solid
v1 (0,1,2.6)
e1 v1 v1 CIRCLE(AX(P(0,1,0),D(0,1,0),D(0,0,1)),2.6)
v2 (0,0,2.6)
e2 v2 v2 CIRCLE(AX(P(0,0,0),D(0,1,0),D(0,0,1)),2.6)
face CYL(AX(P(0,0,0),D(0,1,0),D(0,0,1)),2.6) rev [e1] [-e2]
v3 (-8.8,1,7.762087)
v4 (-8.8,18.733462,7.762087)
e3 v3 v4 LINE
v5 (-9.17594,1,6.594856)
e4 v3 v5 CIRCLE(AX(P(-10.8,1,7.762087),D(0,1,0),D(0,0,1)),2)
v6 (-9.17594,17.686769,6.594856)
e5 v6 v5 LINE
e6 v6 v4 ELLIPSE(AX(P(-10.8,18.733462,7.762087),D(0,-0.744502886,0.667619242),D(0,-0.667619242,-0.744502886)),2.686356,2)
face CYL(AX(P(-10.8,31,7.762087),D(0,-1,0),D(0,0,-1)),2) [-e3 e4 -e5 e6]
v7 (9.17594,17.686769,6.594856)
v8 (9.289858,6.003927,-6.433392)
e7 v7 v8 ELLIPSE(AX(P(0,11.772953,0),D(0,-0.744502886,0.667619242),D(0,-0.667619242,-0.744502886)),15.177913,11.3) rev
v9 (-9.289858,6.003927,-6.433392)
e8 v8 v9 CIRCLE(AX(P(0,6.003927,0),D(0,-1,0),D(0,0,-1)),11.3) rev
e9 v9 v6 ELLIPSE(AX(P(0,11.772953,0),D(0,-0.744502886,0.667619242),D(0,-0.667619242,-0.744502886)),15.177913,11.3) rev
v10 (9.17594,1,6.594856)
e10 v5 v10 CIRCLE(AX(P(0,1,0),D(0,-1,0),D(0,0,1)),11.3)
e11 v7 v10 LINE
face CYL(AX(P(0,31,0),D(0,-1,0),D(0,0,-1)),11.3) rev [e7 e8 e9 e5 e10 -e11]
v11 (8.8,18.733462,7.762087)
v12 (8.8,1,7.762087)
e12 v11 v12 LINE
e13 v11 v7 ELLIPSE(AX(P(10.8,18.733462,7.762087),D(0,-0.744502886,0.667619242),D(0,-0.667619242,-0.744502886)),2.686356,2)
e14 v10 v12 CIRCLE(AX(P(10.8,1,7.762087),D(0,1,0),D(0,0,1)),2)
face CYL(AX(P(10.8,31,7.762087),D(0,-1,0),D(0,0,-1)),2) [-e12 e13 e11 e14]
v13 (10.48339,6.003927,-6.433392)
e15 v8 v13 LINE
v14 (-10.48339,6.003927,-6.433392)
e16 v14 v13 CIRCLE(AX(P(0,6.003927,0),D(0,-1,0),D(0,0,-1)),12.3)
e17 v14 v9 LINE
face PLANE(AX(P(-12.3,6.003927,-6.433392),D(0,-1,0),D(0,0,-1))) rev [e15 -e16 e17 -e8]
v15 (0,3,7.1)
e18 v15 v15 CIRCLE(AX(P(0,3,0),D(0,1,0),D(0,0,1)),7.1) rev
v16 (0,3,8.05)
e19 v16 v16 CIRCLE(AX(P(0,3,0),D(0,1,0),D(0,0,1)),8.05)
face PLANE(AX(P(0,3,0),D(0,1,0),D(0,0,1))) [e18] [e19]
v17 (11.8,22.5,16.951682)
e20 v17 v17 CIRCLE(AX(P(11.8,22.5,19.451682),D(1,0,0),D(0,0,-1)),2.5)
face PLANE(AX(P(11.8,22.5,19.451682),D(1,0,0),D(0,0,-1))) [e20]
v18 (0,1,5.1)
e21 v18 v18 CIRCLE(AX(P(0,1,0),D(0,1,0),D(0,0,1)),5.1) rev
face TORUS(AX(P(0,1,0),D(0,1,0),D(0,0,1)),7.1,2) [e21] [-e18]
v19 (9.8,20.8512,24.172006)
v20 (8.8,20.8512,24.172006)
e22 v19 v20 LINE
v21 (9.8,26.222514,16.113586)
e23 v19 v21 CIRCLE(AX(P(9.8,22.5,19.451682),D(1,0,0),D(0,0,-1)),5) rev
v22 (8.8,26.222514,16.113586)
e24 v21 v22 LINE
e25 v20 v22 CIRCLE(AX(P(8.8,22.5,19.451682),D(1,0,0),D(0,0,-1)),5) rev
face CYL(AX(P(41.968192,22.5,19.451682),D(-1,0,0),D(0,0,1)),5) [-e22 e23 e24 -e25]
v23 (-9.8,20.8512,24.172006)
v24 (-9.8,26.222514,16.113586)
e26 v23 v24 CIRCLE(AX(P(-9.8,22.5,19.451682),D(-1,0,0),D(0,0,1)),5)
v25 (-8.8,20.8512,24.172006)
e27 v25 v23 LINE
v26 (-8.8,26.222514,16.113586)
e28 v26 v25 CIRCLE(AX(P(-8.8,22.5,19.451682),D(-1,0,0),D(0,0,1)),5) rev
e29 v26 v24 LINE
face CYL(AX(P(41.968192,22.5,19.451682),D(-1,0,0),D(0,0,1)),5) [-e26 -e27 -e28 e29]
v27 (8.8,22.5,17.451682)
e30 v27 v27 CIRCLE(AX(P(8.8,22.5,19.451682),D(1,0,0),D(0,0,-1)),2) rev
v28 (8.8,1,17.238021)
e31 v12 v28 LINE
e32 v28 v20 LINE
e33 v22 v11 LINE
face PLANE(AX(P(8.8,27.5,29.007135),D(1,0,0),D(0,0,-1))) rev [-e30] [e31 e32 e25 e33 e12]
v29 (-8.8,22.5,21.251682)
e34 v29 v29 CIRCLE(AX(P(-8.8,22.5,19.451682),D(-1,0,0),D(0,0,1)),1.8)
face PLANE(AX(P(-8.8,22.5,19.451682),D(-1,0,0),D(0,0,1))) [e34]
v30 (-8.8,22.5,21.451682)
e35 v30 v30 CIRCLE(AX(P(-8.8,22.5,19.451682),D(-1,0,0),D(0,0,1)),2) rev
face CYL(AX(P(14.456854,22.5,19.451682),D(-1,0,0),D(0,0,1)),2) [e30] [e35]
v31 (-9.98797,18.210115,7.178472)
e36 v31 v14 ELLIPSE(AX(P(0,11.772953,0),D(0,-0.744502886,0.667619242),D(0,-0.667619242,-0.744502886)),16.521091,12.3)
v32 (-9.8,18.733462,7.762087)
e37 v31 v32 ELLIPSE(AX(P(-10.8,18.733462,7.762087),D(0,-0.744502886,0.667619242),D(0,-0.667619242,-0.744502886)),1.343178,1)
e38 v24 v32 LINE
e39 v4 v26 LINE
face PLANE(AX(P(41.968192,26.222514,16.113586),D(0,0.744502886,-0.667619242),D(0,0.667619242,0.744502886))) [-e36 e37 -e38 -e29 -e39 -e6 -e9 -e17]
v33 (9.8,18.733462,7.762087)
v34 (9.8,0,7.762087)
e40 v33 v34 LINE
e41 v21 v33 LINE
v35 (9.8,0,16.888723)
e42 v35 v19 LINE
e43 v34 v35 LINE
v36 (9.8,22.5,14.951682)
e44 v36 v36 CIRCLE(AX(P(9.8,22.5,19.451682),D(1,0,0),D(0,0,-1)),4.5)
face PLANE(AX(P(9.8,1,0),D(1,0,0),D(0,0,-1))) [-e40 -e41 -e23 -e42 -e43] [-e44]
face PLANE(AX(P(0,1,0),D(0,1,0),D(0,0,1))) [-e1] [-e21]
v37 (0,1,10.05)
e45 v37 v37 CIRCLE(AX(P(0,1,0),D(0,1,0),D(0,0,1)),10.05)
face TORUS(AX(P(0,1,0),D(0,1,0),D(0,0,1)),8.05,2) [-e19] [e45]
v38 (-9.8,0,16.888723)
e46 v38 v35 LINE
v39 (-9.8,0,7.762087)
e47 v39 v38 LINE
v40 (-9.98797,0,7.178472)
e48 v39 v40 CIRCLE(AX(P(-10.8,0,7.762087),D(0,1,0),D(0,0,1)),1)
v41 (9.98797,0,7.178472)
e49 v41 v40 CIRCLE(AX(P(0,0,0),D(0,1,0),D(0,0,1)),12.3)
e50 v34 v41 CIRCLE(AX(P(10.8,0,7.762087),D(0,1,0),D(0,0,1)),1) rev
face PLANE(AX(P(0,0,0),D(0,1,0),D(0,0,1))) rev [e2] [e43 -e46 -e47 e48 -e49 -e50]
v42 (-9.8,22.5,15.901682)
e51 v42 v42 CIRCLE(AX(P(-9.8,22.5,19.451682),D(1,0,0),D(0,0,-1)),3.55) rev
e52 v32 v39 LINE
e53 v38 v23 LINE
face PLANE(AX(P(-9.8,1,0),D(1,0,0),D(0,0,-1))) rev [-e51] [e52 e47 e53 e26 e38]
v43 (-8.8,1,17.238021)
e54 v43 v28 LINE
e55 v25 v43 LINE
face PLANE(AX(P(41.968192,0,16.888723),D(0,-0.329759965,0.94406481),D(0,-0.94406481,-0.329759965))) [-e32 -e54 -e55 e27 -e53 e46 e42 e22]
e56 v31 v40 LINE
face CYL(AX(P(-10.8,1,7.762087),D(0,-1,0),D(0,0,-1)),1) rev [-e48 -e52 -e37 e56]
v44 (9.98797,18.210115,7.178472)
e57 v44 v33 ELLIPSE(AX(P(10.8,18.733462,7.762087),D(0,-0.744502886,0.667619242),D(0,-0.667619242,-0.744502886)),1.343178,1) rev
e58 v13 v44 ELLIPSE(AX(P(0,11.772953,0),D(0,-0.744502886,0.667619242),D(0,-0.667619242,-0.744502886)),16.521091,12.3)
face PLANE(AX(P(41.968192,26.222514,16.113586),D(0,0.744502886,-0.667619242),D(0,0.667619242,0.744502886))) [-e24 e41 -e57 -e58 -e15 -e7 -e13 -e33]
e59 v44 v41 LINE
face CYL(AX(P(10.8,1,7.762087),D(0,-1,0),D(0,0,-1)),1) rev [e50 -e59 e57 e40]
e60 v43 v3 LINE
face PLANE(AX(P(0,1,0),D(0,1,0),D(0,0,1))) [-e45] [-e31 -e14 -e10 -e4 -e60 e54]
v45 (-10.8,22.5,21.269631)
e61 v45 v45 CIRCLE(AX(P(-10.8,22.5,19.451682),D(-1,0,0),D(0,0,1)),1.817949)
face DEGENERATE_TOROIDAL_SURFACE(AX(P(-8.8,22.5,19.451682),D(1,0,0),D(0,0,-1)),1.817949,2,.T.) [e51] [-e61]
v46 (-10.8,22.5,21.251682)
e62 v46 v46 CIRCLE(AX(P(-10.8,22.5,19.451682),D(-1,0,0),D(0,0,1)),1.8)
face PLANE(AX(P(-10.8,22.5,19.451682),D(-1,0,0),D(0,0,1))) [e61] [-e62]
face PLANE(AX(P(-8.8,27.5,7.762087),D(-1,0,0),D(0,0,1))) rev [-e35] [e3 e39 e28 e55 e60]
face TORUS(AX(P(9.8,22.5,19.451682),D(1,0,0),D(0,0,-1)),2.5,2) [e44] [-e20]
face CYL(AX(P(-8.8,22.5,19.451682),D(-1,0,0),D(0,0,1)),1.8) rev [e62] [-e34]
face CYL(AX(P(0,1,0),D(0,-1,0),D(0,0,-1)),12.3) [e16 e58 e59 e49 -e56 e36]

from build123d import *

# Parameters (mm, degrees)
BOSS_EXTRUDE3_DEPTH     = 1
BOSS_EXTRUDE4_DEPTH     = 19.6
CUT_EXTRUDE3_START      = -1
CUT_EXTRUDE3_DEPTH      = 38.799803657
BOSS_EXTRUDE5_DEPTH     = 30
CUT_EXTRUDE4_DEPTH      = 42.354259319
CUT_EXTRUDE4_DEPTH_BACK = 42.354259319
SKETCH9_R               = 2
BOSS_EXTRUDE6_DEPTH     = 17.6
SKETCH10_R              = 3.55
BOSS_EXTRUDE7_DEPTH     = 1
SKETCH11_R              = 1.8
CUT_EXTRUDE5_DEPTH      = 2
SKETCH12_R              = 4.5
BOSS_EXTRUDE8_DEPTH     = 2
SKETCH13_R              = 10.05
SKETCH13_R_2            = 5.1
BOSS_EXTRUDE9_DEPTH     = 2
SKETCH14_R              = 2.6
CUT_EXTRUDE6_DEPTH      = 39.097569002
FILLET2_R               = 2
FILLET3_R               = 2
FILLET4_R               = 2
FILLET5_R               = 2


# Some blends are built 0.0001 mm under size
with BuildPart() as part:
    # Sketch1 → Boss-Extrude3 (new body)
    # profile 1 of 2: a face of its own
    with BuildSketch(Plane(origin=(0, 0, 0), x_dir=(1, 0, 0), z_dir=(0, 1, 0))):
        with BuildLine():
            Line((9.8, -7.762087348), (9.8, -16.888723439))
            Line((9.8, -16.888723439), (-9.8, -16.888723439))
            Line((-9.8, -16.888723439), (-9.8, -7.762087348))
            ThreePointArc((-9.8, -7.762087348), (-9.848151778, -7.455517678), (-9.987969925, -7.178471758))
            ThreePointArc((-9.987969925, -7.178471758), (0, 12.3), (9.987969925, -7.178471758))
            ThreePointArc((9.987969925, -7.178471758), (9.848151778, -7.455517678), (9.8, -7.762087348))
        make_face()
        with BuildLine():
            ThreePointArc((8.8, -7.762087348), (8.896303556, -7.148948009), (9.17593985, -6.594856168))
            ThreePointArc((9.17593985, -6.594856168), (0, 11.3), (-9.17593985, -6.594856168))
            ThreePointArc((-9.17593985, -6.594856168), (-8.896303556, -7.148948009), (-8.8, -7.762087348))
            Line((-8.8, -7.762087348), (-8.8, -15.888723439))
            Line((-8.8, -15.888723439), (8.8, -15.888723439))
            Line((8.8, -15.888723439), (8.8, -7.762087348))
        make_face(mode=Mode.SUBTRACT)
    # profile 2 of 2: a face of its own
    with BuildSketch(Plane(origin=(0, 0, 0), x_dir=(1, 0, 0), z_dir=(0, 1, 0))):
        with BuildLine():
            Line((8.8, -7.762087348), (8.8, -15.888723439))
            Line((8.8, -15.888723439), (-8.8, -15.888723439))
            Line((-8.8, -15.888723439), (-8.8, -7.762087348))
            ThreePointArc((-8.8, -7.762087348), (-8.896303556, -7.148948009), (-9.17593985, -6.594856168))
            ThreePointArc((-9.17593985, -6.594856168), (0, 11.3), (9.17593985, -6.594856168))
            ThreePointArc((9.17593985, -6.594856168), (8.896303556, -7.148948009), (8.8, -7.762087348))
        make_face()
    extrude(amount=BOSS_EXTRUDE3_DEPTH)

    # Sketch2 → Boss-Extrude4 (add)
    with BuildSketch(Plane.ZY.offset(9.8)):
        with BuildLine():
            Line((16.888723439, 0), (24.17200628, 20.851200177))
            ThreePointArc((24.17200628, 20.851200177), (22.22483795, 26.660481625), (16.113586017, 26.22251443))
            Line((16.113586017, 26.22251443), (7.762087348, 18.73346191))
            Line((7.762087348, 18.73346191), (7.762087348, 0))
            Line((7.762087348, 0), (16.888723439, 0))
        make_face()
    extrude(amount=-BOSS_EXTRUDE4_DEPTH)

    # Sketch4 → Cut-Extrude3 (cut, through all)
    with BuildSketch(Plane.XZ.offset(CUT_EXTRUDE3_START)):
        Polygon((8.8, 7.762087348), (8.8, 15.888723439), (8.8, 29.007134954), (-8.8, 29.007134954), (-8.8, 15.888723439), (-8.8, 7.762087348), align=None)
    extrude(amount=-CUT_EXTRUDE3_DEPTH, mode=Mode.SUBTRACT)

    # Sketch5 → Boss-Extrude5 (add)
    with BuildSketch(Plane(origin=(0, 1, 0), x_dir=(1, 0, 0), z_dir=(0, 1, 0))):
        with BuildLine():
            Line((-8.8, -7.762087348), (-9.8, -7.762087348))
            ThreePointArc((-9.8, -7.762087348), (-9.848151778, -7.455517678), (-9.987969925, -7.178471758))
            ThreePointArc((-9.987969925, -7.178471758), (0, 12.3), (9.987969925, -7.178471758))
            ThreePointArc((9.987969925, -7.178471758), (9.848151778, -7.455517678), (9.8, -7.762087348))
            Line((9.8, -7.762087348), (8.8, -7.762087348))
            ThreePointArc((8.8, -7.762087348), (8.896303556, -7.148948009), (9.17593985, -6.594856168))
            ThreePointArc((9.17593985, -6.594856168), (0, 11.3), (-9.17593985, -6.594856168))
            ThreePointArc((-9.17593985, -6.594856168), (-8.896303556, -7.148948009), (-8.8, -7.762087348))
        make_face()
    extrude(amount=BOSS_EXTRUDE5_DEPTH)

    # Sketch7 → Cut-Extrude4 (cut, two sides: drawn at the far end of the back side and taken through both)
    with BuildSketch(Plane(origin=(0, 0, 0), x_dir=(0, 0, -1), z_dir=(1, 0, 0)).offset(-CUT_EXTRUDE4_DEPTH_BACK)):
        Polygon((15.143665649, 54.023758671), (-16.113586017, 54.023758671), (-16.113586017, 26.22251443), (-7.762087348, 18.73346191), (6.433392437, 6.003927025), (15.143665649, 6.003927025), align=None)
    extrude(amount=CUT_EXTRUDE4_DEPTH + CUT_EXTRUDE4_DEPTH_BACK, mode=Mode.SUBTRACT)

    # Sketch9 → Boss-Extrude6 (add)
    with BuildSketch(Plane(origin=(-8.8, 0, 0), x_dir=(0, 0, -1), z_dir=(1, 0, 0))):
        with Locations(Location((-19.451682229, 22.5, 0), (0, 0, 180))):
            Circle(SKETCH9_R)
    extrude(amount=BOSS_EXTRUDE6_DEPTH)

    # Sketch10 → Boss-Extrude7 (add)
    with BuildSketch(Plane.ZY.offset(9.8)):
        with Locations(Location((19.451682229, 22.5, 0), (0, 0, 180))):
            Circle(SKETCH10_R)
    extrude(amount=BOSS_EXTRUDE7_DEPTH)

    # Sketch11 → Cut-Extrude5 (cut)
    with BuildSketch(Plane.ZY.offset(10.8)):
        with Locations((19.451682229, 22.5)):
            Circle(SKETCH11_R)
    extrude(amount=-CUT_EXTRUDE5_DEPTH, mode=Mode.SUBTRACT)

    # Sketch12 → Boss-Extrude8 (add)
    with BuildSketch(Plane(origin=(9.8, 0, 0), x_dir=(0, 0, -1), z_dir=(1, 0, 0))):
        with Locations((-19.451682229, 22.5)):
            Circle(SKETCH12_R)
    extrude(amount=BOSS_EXTRUDE8_DEPTH)

    # Sketch13 → Boss-Extrude9 (add)
    with BuildSketch(Plane(origin=(0, 1, 0), x_dir=(1, 0, 0), z_dir=(0, 1, 0))):
        with Locations(Location((0, 0, 0), (0, 0, 270))):
            Circle(SKETCH13_R)
        with Locations(Location((0, 0, 0), (0, 0, 270))):
            Circle(SKETCH13_R_2, mode=Mode.SUBTRACT)
    extrude(amount=BOSS_EXTRUDE9_DEPTH)

    # Sketch14 → Cut-Extrude6 (cut, through all)
    with BuildSketch(Plane(origin=(0, 1, 0), x_dir=(1, 0, 0), z_dir=(0, 1, 0))):
        with Locations(Location((0, 0, 0), (0, 0, 270))):
            Circle(SKETCH14_R)
    extrude(amount=-CUT_EXTRUDE6_DEPTH, mode=Mode.SUBTRACT)

    # Fillet2
    fillet2_edges = [part.edges().sort_by_distance(p)[0] for p in [
        (0, 3, -5.1),
    ]]
    fillet(fillet2_edges, radius=FILLET2_R - 0.0001)  # a hair under: the kernel refuses the full size

    # Fillet3
    fillet3_edges = [part.edges().sort_by_distance(p)[0] for p in [
        (0, 3, -10.05),
    ]]
    fillet(fillet3_edges, radius=FILLET3_R - 0.0001)  # a hair under: the kernel refuses the full size

    # Fillet4
    # the kernel refuses this fillet: 2 mm, written as the material it takes off along each edge
    with BuildSketch(Plane(origin=(-10.8, 22.5, 19.451682229), x_dir=(0, 0, -1), z_dir=(0, 1, 0))) as fillet4_piece_1:
        with BuildLine():
            CenterArc((1.817949192, -2), FILLET4_R, 30, 60)
            Line((1.817949192, 0), (1.817949192, 0.04))
            Line((1.817949192, 0.04), (3.55, 0.04))
            Line((3.55, 0.04), (3.59, 0))
            ThreePointArc((3.59, 0), (3.59, -0.5), (3.584641016, -0.98))
            Line((3.584641016, -0.98), (3.55, -1))
        make_face()
    revolve(axis=Axis((-10.8, 22.5, 19.451682229), (-1, 0, 0)), mode=Mode.SUBTRACT)

    # Fillet5
    fillet5_edges = [part.edges().sort_by_distance(p)[0] for p in [
        (11.8, 22.5, 23.951682229),
    ]]
    fillet(fillet5_edges, radius=FILLET5_R - 0.0001)  # a hair under: the kernel refuses the full size


solid = part.part
